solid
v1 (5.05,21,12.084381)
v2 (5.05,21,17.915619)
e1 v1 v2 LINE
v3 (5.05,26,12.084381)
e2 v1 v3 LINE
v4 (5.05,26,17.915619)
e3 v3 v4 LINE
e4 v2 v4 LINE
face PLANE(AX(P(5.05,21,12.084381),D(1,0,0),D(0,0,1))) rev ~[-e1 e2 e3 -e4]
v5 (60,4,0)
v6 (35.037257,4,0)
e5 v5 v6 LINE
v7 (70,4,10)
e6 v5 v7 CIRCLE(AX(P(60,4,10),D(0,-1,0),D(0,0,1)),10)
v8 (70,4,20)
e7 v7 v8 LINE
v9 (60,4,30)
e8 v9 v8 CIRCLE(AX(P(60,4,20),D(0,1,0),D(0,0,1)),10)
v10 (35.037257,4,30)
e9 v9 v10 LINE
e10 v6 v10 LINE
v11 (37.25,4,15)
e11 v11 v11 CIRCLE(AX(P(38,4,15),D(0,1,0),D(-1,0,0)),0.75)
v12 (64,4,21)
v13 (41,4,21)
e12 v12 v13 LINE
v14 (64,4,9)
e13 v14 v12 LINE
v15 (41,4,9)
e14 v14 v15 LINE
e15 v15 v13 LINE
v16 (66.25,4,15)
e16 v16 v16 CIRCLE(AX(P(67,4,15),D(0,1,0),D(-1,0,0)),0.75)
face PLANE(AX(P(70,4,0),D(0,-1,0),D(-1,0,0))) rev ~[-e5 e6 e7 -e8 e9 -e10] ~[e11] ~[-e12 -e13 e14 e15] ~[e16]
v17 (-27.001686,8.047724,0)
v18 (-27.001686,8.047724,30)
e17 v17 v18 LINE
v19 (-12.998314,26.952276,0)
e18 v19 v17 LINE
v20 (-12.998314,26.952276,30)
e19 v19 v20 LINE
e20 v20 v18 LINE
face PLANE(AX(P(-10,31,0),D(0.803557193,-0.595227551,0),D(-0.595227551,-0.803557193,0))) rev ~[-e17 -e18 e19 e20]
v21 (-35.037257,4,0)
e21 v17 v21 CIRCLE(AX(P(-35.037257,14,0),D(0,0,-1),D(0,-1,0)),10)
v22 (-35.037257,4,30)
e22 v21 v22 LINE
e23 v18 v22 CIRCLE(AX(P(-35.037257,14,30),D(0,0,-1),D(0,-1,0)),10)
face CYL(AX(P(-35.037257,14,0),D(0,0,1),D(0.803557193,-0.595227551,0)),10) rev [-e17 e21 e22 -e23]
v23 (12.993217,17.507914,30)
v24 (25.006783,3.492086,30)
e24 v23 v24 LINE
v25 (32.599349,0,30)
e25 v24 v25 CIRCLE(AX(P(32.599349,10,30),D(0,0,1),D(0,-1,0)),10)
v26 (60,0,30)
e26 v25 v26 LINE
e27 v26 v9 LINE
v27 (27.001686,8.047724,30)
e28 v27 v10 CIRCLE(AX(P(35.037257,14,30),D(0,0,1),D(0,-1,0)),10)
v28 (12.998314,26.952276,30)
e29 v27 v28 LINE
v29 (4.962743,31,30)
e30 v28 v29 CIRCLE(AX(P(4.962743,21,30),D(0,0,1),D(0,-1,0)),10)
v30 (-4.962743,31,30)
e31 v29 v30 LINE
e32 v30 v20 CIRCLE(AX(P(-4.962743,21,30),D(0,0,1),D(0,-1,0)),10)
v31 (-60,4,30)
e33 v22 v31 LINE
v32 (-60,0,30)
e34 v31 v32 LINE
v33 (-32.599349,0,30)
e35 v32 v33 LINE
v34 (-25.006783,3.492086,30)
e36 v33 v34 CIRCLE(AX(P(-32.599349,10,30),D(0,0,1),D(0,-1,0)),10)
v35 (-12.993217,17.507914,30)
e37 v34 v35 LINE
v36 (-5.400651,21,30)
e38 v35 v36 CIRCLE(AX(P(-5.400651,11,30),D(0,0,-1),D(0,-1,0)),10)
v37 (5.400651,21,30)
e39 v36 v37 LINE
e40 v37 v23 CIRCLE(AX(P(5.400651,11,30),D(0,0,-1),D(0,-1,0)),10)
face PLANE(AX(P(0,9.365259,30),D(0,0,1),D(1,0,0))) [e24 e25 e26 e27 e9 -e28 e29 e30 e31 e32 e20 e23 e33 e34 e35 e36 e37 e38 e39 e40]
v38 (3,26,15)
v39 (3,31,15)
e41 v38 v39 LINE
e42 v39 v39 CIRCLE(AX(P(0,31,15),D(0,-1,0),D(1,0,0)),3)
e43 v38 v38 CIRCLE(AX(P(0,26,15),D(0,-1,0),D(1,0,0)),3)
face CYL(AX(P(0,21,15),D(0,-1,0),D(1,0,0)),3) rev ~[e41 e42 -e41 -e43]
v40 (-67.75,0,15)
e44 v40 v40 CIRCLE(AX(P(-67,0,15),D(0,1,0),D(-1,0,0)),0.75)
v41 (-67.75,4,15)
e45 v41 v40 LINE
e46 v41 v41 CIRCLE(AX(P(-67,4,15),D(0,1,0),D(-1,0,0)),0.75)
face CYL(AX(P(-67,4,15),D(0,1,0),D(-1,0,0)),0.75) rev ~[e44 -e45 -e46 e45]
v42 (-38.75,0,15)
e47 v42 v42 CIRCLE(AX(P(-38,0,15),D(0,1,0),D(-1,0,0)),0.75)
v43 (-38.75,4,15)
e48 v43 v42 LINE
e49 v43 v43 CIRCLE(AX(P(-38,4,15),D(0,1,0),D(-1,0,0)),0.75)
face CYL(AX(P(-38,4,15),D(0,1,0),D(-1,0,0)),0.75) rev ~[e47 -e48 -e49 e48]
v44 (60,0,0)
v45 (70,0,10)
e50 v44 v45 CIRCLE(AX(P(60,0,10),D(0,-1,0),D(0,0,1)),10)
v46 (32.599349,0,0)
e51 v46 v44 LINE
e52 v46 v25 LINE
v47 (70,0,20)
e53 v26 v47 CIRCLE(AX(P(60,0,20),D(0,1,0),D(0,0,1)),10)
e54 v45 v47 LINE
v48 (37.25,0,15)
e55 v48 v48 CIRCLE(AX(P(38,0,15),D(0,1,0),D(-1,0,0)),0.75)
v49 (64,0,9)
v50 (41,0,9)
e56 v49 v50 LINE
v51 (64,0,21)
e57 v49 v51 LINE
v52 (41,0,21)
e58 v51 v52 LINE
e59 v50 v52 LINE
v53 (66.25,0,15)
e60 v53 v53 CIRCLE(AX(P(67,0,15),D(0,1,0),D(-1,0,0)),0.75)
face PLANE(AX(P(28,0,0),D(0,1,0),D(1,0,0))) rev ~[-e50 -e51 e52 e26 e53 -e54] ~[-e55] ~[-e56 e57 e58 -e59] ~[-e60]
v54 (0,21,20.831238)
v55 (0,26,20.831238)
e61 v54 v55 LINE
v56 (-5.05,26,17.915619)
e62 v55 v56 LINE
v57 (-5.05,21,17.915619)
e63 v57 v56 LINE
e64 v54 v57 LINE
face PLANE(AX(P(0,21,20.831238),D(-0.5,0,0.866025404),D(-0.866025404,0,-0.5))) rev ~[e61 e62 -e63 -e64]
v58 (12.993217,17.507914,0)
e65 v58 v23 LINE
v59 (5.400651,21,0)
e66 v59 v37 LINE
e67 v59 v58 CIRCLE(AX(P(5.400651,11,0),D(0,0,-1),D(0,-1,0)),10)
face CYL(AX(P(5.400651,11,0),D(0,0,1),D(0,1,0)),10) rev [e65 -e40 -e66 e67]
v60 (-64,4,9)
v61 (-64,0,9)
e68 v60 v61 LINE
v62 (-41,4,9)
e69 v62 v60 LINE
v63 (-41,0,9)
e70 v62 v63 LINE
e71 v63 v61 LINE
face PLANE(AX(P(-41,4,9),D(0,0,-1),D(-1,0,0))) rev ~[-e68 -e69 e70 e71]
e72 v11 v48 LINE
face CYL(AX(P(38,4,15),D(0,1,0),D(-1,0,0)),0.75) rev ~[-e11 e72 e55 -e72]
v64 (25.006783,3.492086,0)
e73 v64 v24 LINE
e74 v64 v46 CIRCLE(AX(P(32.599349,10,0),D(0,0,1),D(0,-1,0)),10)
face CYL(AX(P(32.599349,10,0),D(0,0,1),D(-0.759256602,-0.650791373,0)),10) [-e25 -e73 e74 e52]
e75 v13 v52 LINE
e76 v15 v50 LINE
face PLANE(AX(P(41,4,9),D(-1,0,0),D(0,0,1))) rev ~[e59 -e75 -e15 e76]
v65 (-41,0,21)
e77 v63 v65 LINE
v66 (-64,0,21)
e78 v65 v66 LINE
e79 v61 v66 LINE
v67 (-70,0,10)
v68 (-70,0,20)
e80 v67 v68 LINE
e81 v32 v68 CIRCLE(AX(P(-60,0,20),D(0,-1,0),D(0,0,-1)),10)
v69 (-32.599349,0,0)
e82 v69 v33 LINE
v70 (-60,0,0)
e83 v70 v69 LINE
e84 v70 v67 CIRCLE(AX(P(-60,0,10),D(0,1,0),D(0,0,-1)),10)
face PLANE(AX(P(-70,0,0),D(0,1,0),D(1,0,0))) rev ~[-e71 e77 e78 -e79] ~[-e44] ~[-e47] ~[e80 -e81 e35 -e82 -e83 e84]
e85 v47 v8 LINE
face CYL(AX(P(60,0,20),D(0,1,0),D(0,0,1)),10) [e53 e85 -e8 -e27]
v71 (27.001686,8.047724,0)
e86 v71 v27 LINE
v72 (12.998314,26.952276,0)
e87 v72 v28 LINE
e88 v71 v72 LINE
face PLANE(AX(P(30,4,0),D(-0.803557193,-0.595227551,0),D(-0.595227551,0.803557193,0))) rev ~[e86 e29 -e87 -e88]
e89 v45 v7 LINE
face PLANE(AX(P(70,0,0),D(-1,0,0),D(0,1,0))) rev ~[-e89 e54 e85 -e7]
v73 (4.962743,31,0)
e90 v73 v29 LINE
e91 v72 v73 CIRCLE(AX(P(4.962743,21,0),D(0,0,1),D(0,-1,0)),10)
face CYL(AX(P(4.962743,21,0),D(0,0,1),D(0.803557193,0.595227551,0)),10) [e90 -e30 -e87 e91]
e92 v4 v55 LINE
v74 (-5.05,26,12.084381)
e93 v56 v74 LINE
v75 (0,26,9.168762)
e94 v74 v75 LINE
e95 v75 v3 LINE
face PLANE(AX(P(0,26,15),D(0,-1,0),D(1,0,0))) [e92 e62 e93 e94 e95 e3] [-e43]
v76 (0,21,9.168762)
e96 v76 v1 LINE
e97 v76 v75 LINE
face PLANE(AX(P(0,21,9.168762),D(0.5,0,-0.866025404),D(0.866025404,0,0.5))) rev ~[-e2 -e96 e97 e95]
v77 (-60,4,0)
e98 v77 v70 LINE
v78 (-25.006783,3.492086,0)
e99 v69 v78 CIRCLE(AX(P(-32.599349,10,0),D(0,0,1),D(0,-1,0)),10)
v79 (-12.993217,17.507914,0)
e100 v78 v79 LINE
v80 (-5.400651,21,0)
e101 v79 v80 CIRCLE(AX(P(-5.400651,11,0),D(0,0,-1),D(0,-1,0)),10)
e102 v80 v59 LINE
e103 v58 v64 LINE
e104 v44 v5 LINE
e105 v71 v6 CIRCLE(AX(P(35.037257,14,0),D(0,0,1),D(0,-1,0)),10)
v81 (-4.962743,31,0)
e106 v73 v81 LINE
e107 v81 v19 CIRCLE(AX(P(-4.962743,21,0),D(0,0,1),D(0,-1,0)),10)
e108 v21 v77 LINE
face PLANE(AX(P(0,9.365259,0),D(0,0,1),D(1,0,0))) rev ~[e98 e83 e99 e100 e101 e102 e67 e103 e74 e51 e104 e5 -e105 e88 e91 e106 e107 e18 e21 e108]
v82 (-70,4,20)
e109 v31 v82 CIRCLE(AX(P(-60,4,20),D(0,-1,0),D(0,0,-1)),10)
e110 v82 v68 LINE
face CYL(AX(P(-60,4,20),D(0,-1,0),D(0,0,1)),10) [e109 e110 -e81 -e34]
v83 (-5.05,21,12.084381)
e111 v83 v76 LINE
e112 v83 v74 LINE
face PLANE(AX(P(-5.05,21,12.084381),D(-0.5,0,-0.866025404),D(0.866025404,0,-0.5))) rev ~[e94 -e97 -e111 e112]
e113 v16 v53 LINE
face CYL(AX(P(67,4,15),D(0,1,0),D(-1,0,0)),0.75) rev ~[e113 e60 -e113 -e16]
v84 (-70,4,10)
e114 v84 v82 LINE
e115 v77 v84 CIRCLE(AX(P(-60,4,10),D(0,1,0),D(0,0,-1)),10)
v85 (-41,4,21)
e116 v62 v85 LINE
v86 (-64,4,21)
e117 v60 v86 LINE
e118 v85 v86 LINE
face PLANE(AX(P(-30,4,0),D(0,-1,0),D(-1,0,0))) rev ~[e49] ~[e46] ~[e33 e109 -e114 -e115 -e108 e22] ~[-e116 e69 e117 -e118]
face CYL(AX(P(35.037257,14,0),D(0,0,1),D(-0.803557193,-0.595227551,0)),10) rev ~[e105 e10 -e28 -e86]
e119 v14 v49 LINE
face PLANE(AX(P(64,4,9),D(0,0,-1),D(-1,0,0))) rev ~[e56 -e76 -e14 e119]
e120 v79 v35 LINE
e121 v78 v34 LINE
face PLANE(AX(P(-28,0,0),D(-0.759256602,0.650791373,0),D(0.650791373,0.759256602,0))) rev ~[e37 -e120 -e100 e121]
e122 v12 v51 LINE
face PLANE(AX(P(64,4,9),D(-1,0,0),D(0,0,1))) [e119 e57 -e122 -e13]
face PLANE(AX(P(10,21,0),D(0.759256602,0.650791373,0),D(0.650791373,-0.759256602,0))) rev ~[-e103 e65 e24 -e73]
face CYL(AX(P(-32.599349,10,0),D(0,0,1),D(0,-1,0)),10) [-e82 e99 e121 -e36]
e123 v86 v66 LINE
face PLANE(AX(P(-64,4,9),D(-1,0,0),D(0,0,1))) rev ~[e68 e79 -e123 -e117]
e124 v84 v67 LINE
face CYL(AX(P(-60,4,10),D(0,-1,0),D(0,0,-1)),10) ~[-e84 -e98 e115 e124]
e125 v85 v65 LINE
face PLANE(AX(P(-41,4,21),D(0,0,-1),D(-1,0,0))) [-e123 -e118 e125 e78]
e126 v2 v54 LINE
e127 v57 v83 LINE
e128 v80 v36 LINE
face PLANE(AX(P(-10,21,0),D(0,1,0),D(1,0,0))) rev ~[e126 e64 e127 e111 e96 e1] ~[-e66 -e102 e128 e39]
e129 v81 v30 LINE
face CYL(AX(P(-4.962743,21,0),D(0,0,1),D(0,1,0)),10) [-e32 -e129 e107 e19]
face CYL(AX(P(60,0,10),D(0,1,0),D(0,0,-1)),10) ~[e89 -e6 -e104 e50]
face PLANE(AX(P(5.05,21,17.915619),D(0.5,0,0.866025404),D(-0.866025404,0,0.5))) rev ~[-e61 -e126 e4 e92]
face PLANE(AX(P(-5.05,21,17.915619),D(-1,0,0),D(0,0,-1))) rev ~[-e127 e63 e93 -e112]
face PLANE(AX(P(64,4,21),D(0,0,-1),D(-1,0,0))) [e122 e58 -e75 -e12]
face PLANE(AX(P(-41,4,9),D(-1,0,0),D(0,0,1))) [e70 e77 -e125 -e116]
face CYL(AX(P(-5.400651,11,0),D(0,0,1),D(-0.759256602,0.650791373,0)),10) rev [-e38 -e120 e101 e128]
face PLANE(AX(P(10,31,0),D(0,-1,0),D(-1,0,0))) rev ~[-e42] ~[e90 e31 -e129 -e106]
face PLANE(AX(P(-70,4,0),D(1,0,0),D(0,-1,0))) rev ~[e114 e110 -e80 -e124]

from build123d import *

# Parameters (mm, degrees)
F1_DEPTH = 30
F2_W     = 23
F2_H     = 12
F2_R     = 0.75
F3_DEPTH = 25
F4_R     = 10
F5_R     = 3
F6_DEPTH = 25
F7_DEPTH = 5


# Not quite as in the source:
# - a feature names something its author has since deleted; it is built from what else it names


with BuildPart() as f1:
    # F0 (on Top) → F1 (new body)
    with BuildSketch(Plane.XY):
        Polygon((30, 4), (10, 31), (-10, 31), (-30, 4), (-70, 4), (-70, 0), (-28, 0), (-10, 21), (10, 21), (28, 0), (70, 0), (70, 4), align=None)
    extrude(amount=F1_DEPTH)

    # F2 (on face) → F3 (cut)
    with BuildSketch(Plane(origin=(0, 4, 0), x_dir=(-1, 0, 0), z_dir=(0, 1, 0))):
        with Locations((52.5, 15)):
            Rectangle(F2_W, F2_H)
        with Locations((-52.5, 15)):
            Rectangle(F2_W, F2_H)
        with Locations((-38, 15)):
            Circle(F2_R)
        with Locations((-67, 15)):
            Circle(F2_R)
        with Locations((38, 15)):
            Circle(F2_R)
        with Locations((67, 15)):
            Circle(F2_R)
    extrude(amount=-F3_DEPTH, mode=Mode.SUBTRACT)

    # F4
    f4_edges = [f1.edges().sort_by_distance(p)[0] for p in [
        (-70, 2, 30),
        (-70, 2, 0),
        (70, 2, 30),
        (70, 2, 0),
        (30, 4, 15),
        (-30, 4, 15),
        (-10, 31, 15),
        (10, 31, 15),
        (-28, 0, 15),
        (-10, 21, 15),
        (10, 21, 15),
        (28, 0, 15),
    ]]
    fillet(f4_edges, radius=F4_R)

    # F5 (on face) → F6 (cut)
    with BuildSketch(Plane.XZ.offset(-21)):
        with Locations((0, 15)):
            Circle(F5_R)
    extrude(amount=-F6_DEPTH, mode=Mode.SUBTRACT)

    # F5 (on face) → F7 (cut)
    with BuildSketch(Plane.XZ.offset(-21)):
        Polygon((0, 9.1687622812), (5.05, 12.0843811406), (5.05, 17.9156188594), (0, 20.8312377188), (-5.05, 17.9156188594), (-5.05, 12.0843811406), align=None)
        with Locations((0, 15)):
            Circle(F5_R, mode=Mode.SUBTRACT)
    extrude(amount=-F7_DEPTH, mode=Mode.SUBTRACT)


solid = f1.part
